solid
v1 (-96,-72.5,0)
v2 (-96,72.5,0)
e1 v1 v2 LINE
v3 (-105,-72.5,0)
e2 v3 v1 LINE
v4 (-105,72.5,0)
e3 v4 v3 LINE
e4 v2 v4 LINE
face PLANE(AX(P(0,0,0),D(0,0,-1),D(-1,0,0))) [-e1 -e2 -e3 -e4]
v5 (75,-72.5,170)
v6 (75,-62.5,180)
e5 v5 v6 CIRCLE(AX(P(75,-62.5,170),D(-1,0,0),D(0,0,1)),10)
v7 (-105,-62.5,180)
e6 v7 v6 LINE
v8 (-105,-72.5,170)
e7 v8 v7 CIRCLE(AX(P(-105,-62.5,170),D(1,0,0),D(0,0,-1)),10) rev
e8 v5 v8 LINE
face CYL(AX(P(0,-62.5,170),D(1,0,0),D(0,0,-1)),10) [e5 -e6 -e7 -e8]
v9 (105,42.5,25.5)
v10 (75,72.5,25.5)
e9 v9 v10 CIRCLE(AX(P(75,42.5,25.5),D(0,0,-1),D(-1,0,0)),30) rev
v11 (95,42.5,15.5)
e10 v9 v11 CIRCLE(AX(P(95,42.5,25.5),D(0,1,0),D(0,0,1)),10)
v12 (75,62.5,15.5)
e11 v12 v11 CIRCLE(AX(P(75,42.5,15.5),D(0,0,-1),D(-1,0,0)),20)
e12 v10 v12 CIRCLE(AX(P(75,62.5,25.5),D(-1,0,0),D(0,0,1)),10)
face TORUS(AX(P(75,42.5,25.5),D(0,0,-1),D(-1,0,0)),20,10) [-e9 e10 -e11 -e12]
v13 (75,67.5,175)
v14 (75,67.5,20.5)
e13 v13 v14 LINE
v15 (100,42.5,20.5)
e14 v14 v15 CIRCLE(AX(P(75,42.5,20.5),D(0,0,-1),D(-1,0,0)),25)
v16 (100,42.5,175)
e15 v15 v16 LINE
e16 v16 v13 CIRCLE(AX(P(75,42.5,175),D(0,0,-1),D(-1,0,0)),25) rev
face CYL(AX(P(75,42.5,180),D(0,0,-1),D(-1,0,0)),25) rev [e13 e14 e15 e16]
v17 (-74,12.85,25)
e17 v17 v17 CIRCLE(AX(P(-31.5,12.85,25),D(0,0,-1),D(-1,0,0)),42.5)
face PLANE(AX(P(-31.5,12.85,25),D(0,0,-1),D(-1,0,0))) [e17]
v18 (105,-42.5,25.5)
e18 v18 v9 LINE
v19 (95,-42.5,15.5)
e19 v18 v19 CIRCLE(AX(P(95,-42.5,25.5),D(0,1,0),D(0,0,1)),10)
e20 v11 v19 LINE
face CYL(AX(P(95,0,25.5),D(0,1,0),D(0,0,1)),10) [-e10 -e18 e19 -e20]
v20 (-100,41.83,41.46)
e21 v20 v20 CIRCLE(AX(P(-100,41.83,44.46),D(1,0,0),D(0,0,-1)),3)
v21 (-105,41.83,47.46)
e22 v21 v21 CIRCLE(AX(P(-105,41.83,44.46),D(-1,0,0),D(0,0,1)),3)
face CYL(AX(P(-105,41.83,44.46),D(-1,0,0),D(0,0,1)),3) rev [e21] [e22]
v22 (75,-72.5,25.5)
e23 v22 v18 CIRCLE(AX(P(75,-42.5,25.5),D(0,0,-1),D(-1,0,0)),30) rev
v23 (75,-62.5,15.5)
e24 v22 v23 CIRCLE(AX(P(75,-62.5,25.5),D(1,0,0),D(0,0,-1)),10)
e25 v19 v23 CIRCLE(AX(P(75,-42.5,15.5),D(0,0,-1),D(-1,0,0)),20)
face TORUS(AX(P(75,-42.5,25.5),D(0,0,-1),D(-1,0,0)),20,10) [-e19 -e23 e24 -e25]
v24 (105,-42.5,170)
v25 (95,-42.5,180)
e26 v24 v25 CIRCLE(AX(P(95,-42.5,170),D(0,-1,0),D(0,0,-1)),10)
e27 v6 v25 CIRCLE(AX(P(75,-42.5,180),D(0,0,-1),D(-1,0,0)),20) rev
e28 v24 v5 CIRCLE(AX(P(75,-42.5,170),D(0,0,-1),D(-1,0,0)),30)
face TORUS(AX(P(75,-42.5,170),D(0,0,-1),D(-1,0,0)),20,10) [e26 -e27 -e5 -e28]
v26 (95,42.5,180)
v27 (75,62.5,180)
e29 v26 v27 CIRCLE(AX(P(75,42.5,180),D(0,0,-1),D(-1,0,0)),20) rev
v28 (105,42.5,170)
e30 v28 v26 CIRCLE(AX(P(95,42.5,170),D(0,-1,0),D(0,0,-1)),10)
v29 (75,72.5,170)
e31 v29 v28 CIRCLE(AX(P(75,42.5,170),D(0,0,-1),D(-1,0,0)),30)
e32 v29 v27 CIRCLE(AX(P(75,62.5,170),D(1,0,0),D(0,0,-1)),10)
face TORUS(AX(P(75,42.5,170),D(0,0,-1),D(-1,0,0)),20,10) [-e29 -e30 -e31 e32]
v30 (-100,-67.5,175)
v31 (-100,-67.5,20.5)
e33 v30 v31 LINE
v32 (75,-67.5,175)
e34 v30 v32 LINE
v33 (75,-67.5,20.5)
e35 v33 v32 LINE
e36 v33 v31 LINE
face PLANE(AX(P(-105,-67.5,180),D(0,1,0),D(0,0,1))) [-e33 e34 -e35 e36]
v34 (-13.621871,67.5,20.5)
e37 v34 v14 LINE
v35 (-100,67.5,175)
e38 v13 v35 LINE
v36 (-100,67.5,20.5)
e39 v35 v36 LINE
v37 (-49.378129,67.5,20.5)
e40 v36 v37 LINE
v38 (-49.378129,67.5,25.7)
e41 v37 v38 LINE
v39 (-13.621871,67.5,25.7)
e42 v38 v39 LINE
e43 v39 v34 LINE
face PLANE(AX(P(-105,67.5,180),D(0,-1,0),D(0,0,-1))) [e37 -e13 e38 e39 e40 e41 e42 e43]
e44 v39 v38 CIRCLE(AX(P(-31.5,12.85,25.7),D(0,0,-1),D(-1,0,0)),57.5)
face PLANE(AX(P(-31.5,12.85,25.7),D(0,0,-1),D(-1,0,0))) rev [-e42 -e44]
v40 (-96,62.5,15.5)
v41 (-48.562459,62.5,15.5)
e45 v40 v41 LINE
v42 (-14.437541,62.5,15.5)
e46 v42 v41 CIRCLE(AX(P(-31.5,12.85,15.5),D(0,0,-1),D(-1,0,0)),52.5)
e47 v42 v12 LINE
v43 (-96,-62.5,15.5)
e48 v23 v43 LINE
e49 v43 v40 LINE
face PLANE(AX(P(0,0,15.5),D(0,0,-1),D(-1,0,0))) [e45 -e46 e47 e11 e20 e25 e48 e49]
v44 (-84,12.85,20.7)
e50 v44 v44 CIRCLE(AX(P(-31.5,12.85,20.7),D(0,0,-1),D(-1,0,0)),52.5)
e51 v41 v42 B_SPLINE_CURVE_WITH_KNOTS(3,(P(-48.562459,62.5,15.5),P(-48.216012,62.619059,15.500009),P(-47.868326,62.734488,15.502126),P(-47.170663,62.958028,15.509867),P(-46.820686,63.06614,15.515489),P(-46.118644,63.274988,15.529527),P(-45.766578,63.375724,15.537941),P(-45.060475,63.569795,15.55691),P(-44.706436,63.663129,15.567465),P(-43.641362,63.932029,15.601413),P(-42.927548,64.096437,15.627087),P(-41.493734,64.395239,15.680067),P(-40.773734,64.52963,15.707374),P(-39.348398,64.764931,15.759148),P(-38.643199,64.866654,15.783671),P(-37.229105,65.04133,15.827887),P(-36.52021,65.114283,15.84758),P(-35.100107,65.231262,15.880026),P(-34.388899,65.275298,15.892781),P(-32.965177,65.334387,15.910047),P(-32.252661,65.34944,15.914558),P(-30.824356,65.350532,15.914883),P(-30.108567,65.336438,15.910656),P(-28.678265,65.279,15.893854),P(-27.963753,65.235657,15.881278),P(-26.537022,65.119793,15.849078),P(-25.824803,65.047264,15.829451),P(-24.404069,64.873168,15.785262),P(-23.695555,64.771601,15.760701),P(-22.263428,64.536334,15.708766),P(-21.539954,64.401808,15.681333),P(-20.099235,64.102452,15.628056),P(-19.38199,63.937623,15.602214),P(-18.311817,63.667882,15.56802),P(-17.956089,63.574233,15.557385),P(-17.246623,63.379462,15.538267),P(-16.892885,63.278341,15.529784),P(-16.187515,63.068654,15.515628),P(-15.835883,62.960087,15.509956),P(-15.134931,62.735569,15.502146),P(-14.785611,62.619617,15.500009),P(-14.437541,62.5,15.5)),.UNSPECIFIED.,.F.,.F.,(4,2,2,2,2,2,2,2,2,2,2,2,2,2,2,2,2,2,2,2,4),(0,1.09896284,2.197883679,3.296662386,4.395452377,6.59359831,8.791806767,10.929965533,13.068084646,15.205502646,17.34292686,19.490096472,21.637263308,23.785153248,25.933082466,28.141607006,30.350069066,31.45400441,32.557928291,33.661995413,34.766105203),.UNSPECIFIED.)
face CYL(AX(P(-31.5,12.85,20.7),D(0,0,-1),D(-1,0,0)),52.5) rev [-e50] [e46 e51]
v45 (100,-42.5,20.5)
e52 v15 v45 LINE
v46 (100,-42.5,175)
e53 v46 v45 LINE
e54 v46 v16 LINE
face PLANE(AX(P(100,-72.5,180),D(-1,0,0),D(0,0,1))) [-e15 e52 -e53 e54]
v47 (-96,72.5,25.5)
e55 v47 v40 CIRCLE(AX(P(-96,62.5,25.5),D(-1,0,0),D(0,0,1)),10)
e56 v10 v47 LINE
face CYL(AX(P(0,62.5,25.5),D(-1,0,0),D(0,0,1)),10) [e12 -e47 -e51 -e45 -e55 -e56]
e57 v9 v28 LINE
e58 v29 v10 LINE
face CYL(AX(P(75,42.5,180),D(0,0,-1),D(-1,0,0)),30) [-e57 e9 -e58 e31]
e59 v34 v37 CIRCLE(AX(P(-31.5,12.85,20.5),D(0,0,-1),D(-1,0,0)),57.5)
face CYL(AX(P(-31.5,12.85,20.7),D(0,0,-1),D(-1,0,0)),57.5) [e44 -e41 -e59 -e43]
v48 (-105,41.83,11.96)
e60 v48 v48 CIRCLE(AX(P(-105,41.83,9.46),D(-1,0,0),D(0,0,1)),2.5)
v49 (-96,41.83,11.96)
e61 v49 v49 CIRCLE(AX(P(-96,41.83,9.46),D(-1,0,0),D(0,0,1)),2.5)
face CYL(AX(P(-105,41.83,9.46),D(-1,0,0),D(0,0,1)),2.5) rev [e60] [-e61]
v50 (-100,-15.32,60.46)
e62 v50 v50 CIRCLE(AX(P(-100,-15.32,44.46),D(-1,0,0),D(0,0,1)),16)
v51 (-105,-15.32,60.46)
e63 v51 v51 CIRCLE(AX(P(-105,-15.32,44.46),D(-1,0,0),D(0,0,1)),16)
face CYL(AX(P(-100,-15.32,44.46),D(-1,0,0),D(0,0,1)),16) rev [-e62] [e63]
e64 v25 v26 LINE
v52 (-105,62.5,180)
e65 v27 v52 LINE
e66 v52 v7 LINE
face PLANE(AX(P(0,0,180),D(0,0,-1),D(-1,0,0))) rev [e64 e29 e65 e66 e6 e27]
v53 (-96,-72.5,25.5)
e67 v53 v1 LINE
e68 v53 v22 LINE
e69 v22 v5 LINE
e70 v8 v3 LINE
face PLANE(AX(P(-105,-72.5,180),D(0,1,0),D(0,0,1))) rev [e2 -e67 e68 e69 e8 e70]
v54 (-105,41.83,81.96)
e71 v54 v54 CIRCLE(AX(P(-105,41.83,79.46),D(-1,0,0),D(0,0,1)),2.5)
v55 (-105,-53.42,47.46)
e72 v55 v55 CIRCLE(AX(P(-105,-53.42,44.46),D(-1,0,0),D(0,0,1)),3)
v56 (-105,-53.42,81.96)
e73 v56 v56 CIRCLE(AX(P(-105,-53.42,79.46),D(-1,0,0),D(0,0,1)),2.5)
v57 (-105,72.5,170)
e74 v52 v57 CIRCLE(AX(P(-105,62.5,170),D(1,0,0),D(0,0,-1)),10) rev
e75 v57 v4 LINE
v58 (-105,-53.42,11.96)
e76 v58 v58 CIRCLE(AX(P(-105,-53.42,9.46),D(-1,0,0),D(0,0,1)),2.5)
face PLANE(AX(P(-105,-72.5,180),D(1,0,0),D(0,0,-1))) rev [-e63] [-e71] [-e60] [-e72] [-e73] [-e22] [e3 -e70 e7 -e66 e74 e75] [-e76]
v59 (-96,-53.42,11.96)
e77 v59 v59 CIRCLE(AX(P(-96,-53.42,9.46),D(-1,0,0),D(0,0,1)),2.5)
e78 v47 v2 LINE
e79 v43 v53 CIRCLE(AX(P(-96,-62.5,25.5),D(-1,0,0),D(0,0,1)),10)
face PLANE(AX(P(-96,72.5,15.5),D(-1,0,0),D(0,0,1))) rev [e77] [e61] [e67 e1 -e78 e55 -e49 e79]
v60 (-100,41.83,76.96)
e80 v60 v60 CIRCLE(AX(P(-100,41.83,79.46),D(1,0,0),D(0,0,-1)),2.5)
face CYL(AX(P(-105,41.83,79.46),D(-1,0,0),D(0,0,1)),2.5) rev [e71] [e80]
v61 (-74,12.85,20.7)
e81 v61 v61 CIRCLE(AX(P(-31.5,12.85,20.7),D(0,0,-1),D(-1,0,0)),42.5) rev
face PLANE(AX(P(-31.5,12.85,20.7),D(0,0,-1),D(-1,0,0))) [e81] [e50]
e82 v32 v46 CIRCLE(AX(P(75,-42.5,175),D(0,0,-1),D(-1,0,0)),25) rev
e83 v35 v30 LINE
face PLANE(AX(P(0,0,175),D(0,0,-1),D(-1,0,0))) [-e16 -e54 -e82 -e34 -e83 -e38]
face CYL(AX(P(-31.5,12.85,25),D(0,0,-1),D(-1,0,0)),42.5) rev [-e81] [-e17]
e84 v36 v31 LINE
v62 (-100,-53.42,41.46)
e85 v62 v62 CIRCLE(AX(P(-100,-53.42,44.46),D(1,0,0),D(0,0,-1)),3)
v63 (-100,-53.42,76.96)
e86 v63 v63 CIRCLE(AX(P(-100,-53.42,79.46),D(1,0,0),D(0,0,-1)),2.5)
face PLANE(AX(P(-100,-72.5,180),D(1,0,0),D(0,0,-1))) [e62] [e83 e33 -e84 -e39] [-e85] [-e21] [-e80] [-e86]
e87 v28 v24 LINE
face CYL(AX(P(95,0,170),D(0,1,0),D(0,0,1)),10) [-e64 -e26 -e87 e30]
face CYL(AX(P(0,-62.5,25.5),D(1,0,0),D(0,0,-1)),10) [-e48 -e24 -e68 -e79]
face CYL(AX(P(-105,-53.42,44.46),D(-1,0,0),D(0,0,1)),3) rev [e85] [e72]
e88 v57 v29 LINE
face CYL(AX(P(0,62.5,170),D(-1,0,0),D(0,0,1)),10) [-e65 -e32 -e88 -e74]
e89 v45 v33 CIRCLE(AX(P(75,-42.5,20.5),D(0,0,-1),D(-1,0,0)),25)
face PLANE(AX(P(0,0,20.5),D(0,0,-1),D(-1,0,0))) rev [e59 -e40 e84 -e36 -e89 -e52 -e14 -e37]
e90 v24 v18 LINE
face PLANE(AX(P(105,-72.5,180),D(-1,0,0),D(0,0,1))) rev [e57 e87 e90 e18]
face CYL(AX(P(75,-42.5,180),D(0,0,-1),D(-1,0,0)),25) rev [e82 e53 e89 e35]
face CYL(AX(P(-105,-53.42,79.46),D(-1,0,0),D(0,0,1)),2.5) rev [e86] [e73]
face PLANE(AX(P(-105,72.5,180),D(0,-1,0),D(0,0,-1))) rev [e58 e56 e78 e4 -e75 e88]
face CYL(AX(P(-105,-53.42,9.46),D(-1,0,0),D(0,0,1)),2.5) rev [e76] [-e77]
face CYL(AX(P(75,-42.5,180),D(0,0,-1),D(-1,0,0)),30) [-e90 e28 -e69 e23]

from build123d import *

# Parameters (mm, degrees)
SKETCH1_W                 = 210
SKETCH1_H                 = 145
BOSS_EXTRUDE1_DEPTH       = 180
SKETCH9_W                 = 201
SKETCH9_H                 = 145
CUT_EXTRUDE4_DEPTH        = 15.5
SKETCH2_R                 = 42.5
CUT_EXTRUDE1_DEPTH        = 25
SKETCH3_R                 = 52.5
CUT_EXTRUDE2_DEPTH        = 5.2
SKETCH4_R                 = 16
CUT_EXTRUDE3_DEPTH        = 5
FILLET1_R                 = 30
SHELL1_START              = 25.7
SHELL1_DEPTH              = 149.3
SHELL1_START_2            = 20.5
SHELL1_2_DEPTH            = 5.2
M6_TAPPED_HOLE1_D         = 5
M6_TAPPED_HOLE1_DEPTH     = 10
M6_TAPPED_HOLE1_TIP       = 1.502151548
F_6_0MM_DOWEL_HOLE1_D     = 6
F_6_0MM_DOWEL_HOLE1_DEPTH = 13
F_6_0MM_DOWEL_HOLE1_TIP   = 1.802581857
FILLET2_R                 = 10


# Read off the part's stored shape, not the designer's step: Shell1
with BuildPart() as part:
    # Sketch1 → Boss-Extrude1 (new body)
    with BuildSketch(Plane.XY):
        Rectangle(SKETCH1_W, SKETCH1_H)
    extrude(amount=BOSS_EXTRUDE1_DEPTH)

    # Sketch9 → Cut-Extrude4 (cut)
    with BuildSketch(Plane(origin=(0, 0, 0), x_dir=(-1, 0, 0), z_dir=(0, 0, -1))):
        with Locations((-4.5, 0)):
            Rectangle(SKETCH9_W, SKETCH9_H)
    extrude(amount=-CUT_EXTRUDE4_DEPTH, mode=Mode.SUBTRACT)

    # Sketch2 → Cut-Extrude1 (cut)
    with BuildSketch(Plane(origin=(0, 0, 0), x_dir=(-1, 0, 0), z_dir=(0, 0, -1))):
        with Locations((31.5, 12.85)):
            Circle(SKETCH2_R)
    extrude(amount=-CUT_EXTRUDE1_DEPTH, mode=Mode.SUBTRACT)

    # Sketch3 → Cut-Extrude2 (cut)
    with BuildSketch(Plane(origin=(0, 0, 15.5), x_dir=(-1, 0, 0), z_dir=(0, 0, -1))):
        with Locations((31.5, 12.85)):
            Circle(SKETCH3_R)
    extrude(amount=-CUT_EXTRUDE2_DEPTH, mode=Mode.SUBTRACT)

    # Sketch4 → Cut-Extrude3 (cut)
    with BuildSketch(Plane.ZY.offset(105)):
        with Locations((44.46, -15.32)):
            Circle(SKETCH4_R)
    extrude(amount=-CUT_EXTRUDE3_DEPTH, mode=Mode.SUBTRACT)

    # Fillet1
    fillet1_edges = [part.edges().sort_by_distance(p)[0] for p in [
        (105, -72.5, 97.75),
        (105, 72.5, 97.75),
    ]]
    fillet(fillet1_edges, radius=FILLET1_R)

    # Shell1 outline → Shell1 (cut)
    with BuildSketch(Plane.XY.offset(SHELL1_START)):
        with BuildLine():
            Line((-100, -67.5), (75, -67.5))
            ThreePointArc((75, -67.5), (92.67766953, -60.17766953), (100, -42.5))
            Line((100, -42.5), (100, 42.5))
            ThreePointArc((100, 42.5), (92.67766953, 60.17766953), (75, 67.5))
            Line((75, 67.5), (-100, 67.5))
            Line((-100, 67.5), (-100, -67.5))
        make_face()
    extrude(amount=SHELL1_DEPTH, mode=Mode.SUBTRACT)

    # Shell1 2 outline → Shell1 2 (cut)
    with BuildSketch(Plane.XY.offset(SHELL1_START_2)):
        with BuildLine():
            Line((-100, 67.5), (-100, -67.5))
            Line((-100, -67.5), (75, -67.5))
            ThreePointArc((75, -67.5), (92.67766953, -60.17766953), (100, -42.5))
            Line((100, -42.5), (100, 42.5))
            ThreePointArc((100, 42.5), (92.67766953, 60.17766953), (75, 67.5))
            Line((75, 67.5), (-13.621870903, 67.5))
            ThreePointArc((-13.621870903, 67.5), (-31.5, -44.65), (-49.378129097, 67.5))
            Line((-49.378129097, 67.5), (-100, 67.5))
        make_face()
    extrude(amount=SHELL1_2_DEPTH, mode=Mode.SUBTRACT)

    # M6 Tapped Hole1
    with Locations(Plane.ZY.offset(105)):
        with Locations((9.46, 41.83), (79.46, 41.83), (79.46, -53.42), (9.46, -53.42)):
            Hole(M6_TAPPED_HOLE1_D / 2, depth=M6_TAPPED_HOLE1_DEPTH)
            with Locations((0, 0, -(M6_TAPPED_HOLE1_DEPTH + M6_TAPPED_HOLE1_TIP / 2))):  # 118° drill point
                Cone(0, M6_TAPPED_HOLE1_D / 2, M6_TAPPED_HOLE1_TIP, mode=Mode.SUBTRACT)

    # Ø6.0mm Dowel Hole1
    with Locations(Plane.ZY.offset(105)):
        with Locations((44.46, 41.83), (44.46, -53.42)):
            Hole(F_6_0MM_DOWEL_HOLE1_D / 2, depth=F_6_0MM_DOWEL_HOLE1_DEPTH)
            with Locations((0, 0, -(F_6_0MM_DOWEL_HOLE1_DEPTH + F_6_0MM_DOWEL_HOLE1_TIP / 2))):  # 118° drill point
                Cone(0, F_6_0MM_DOWEL_HOLE1_D / 2, F_6_0MM_DOWEL_HOLE1_TIP, mode=Mode.SUBTRACT)

    # Fillet2
    # the kernel refuses this fillet: 10 mm, written as the material it takes off along each edge
    with BuildSketch(Plane(origin=(-130, -72.5, 180), x_dir=(0, 0, -1), z_dir=(1, 0, 0))) as fillet2_piece_1:
        with BuildLine():
            CenterArc((FILLET2_R, FILLET2_R), FILLET2_R, 180, 90)
            Line((0, FILLET2_R), (0, 0))
            Line((0, 0), (FILLET2_R, 0))
        make_face()
    extrude(amount=205, mode=Mode.SUBTRACT)
    with BuildSketch(Plane(origin=(75, 72.5, 15.5), x_dir=(0, -1, 0), z_dir=(-1, 0, 0))) as fillet2_piece_2:
        with BuildLine():
            CenterArc((FILLET2_R, FILLET2_R), FILLET2_R, 180, 90)
            Line((0, FILLET2_R), (0, 0))
            Line((0, 0), (FILLET2_R, 0))
        make_face()
    extrude(amount=171, mode=Mode.SUBTRACT)
    with BuildSketch(Plane(origin=(105, -42.5, 15.5), x_dir=(-1, 0, 0), z_dir=(0, 1, 0))) as fillet2_piece_3:
        with BuildLine():
            CenterArc((FILLET2_R, FILLET2_R), FILLET2_R, 180, 90)
            Line((0, FILLET2_R), (0, 0))
            Line((0, 0), (FILLET2_R, 0))
        make_face()
    extrude(amount=85, mode=Mode.SUBTRACT)
    with BuildSketch(Plane(origin=(105, -42.5, 180), x_dir=(-1, 0, 0), z_dir=(0, 1, 0))) as fillet2_piece_4:
        with BuildLine():
            CenterArc((FILLET2_R, -FILLET2_R), FILLET2_R, 90, 90)
            Line((0, -FILLET2_R), (0, 0))
            Line((0, 0), (FILLET2_R, 0))
        make_face()
    extrude(amount=85, mode=Mode.SUBTRACT)
    with BuildSketch(Plane(origin=(-96, -72.5, 15.5), x_dir=(0, 0, 1), z_dir=(1, 0, 0))) as fillet2_piece_5:
        with BuildLine():
            CenterArc((FILLET2_R, -FILLET2_R), FILLET2_R, 90, 90)
            Line((0, -FILLET2_R), (0, 0))
            Line((0, 0), (FILLET2_R, 0))
        make_face()
    extrude(amount=171, mode=Mode.SUBTRACT)
    with BuildSketch(Plane(origin=(75, 42.5, 15.5), x_dir=(1, 0, 0), z_dir=(0, -1, 0))) as fillet2_piece_6:
        with BuildLine():
            CenterArc((30 - FILLET2_R, FILLET2_R), FILLET2_R, 270, 90)
            Line((30, FILLET2_R), (30, 0))
            Line((30, 0), (30 - FILLET2_R, 0))
        make_face()
    revolve(axis=Axis((75, 42.5, 15.5), (0, 0, 1)), revolution_arc=90, mode=Mode.SUBTRACT)
    with BuildSketch(Plane(origin=(75, -42.5, 15.5), x_dir=(0, -1, 0), z_dir=(-1, 0, 0))) as fillet2_piece_7:
        with BuildLine():
            CenterArc((30 - FILLET2_R, FILLET2_R), FILLET2_R, 270, 90)
            Line((30, FILLET2_R), (30, 0))
            Line((30, 0), (30 - FILLET2_R, 0))
        make_face()
    revolve(axis=Axis((75, -42.5, 15.5), (0, 0, 1)), revolution_arc=90, mode=Mode.SUBTRACT)
    with BuildSketch(Plane(origin=(75, 72.5, 180), x_dir=(0, -1, 0), z_dir=(-1, 0, 0))) as fillet2_piece_8:
        with BuildLine():
            CenterArc((FILLET2_R, -FILLET2_R), FILLET2_R, 90, 90)
            Line((0, -FILLET2_R), (0, 0))
            Line((0, 0), (FILLET2_R, 0))
        make_face()
    extrude(amount=205, mode=Mode.SUBTRACT)
    with BuildSketch(Plane(origin=(75, 42.5, 180), x_dir=(1, 0, 0), z_dir=(0, -1, 0))) as fillet2_piece_9:
        with BuildLine():
            CenterArc((30 - FILLET2_R, -FILLET2_R), FILLET2_R, 0, 90)
            Line((30, -FILLET2_R), (30, 0))
            Line((30, 0), (30 - FILLET2_R, 0))
        make_face()
    revolve(axis=Axis((75, 42.5, 180), (0, 0, 1)), revolution_arc=90, mode=Mode.SUBTRACT)
    with BuildSketch(Plane(origin=(75, -42.5, 180), x_dir=(0, -1, 0), z_dir=(-1, 0, 0))) as fillet2_piece_10:
        with BuildLine():
            CenterArc((30 - FILLET2_R, -FILLET2_R), FILLET2_R, 0, 90)
            Line((30 - FILLET2_R, 0), (30, 0))
            Line((30, 0), (30, -FILLET2_R))
        make_face()
    revolve(axis=Axis((75, -42.5, 180), (0, 0, 1)), revolution_arc=90, mode=Mode.SUBTRACT)


solid = part.part
